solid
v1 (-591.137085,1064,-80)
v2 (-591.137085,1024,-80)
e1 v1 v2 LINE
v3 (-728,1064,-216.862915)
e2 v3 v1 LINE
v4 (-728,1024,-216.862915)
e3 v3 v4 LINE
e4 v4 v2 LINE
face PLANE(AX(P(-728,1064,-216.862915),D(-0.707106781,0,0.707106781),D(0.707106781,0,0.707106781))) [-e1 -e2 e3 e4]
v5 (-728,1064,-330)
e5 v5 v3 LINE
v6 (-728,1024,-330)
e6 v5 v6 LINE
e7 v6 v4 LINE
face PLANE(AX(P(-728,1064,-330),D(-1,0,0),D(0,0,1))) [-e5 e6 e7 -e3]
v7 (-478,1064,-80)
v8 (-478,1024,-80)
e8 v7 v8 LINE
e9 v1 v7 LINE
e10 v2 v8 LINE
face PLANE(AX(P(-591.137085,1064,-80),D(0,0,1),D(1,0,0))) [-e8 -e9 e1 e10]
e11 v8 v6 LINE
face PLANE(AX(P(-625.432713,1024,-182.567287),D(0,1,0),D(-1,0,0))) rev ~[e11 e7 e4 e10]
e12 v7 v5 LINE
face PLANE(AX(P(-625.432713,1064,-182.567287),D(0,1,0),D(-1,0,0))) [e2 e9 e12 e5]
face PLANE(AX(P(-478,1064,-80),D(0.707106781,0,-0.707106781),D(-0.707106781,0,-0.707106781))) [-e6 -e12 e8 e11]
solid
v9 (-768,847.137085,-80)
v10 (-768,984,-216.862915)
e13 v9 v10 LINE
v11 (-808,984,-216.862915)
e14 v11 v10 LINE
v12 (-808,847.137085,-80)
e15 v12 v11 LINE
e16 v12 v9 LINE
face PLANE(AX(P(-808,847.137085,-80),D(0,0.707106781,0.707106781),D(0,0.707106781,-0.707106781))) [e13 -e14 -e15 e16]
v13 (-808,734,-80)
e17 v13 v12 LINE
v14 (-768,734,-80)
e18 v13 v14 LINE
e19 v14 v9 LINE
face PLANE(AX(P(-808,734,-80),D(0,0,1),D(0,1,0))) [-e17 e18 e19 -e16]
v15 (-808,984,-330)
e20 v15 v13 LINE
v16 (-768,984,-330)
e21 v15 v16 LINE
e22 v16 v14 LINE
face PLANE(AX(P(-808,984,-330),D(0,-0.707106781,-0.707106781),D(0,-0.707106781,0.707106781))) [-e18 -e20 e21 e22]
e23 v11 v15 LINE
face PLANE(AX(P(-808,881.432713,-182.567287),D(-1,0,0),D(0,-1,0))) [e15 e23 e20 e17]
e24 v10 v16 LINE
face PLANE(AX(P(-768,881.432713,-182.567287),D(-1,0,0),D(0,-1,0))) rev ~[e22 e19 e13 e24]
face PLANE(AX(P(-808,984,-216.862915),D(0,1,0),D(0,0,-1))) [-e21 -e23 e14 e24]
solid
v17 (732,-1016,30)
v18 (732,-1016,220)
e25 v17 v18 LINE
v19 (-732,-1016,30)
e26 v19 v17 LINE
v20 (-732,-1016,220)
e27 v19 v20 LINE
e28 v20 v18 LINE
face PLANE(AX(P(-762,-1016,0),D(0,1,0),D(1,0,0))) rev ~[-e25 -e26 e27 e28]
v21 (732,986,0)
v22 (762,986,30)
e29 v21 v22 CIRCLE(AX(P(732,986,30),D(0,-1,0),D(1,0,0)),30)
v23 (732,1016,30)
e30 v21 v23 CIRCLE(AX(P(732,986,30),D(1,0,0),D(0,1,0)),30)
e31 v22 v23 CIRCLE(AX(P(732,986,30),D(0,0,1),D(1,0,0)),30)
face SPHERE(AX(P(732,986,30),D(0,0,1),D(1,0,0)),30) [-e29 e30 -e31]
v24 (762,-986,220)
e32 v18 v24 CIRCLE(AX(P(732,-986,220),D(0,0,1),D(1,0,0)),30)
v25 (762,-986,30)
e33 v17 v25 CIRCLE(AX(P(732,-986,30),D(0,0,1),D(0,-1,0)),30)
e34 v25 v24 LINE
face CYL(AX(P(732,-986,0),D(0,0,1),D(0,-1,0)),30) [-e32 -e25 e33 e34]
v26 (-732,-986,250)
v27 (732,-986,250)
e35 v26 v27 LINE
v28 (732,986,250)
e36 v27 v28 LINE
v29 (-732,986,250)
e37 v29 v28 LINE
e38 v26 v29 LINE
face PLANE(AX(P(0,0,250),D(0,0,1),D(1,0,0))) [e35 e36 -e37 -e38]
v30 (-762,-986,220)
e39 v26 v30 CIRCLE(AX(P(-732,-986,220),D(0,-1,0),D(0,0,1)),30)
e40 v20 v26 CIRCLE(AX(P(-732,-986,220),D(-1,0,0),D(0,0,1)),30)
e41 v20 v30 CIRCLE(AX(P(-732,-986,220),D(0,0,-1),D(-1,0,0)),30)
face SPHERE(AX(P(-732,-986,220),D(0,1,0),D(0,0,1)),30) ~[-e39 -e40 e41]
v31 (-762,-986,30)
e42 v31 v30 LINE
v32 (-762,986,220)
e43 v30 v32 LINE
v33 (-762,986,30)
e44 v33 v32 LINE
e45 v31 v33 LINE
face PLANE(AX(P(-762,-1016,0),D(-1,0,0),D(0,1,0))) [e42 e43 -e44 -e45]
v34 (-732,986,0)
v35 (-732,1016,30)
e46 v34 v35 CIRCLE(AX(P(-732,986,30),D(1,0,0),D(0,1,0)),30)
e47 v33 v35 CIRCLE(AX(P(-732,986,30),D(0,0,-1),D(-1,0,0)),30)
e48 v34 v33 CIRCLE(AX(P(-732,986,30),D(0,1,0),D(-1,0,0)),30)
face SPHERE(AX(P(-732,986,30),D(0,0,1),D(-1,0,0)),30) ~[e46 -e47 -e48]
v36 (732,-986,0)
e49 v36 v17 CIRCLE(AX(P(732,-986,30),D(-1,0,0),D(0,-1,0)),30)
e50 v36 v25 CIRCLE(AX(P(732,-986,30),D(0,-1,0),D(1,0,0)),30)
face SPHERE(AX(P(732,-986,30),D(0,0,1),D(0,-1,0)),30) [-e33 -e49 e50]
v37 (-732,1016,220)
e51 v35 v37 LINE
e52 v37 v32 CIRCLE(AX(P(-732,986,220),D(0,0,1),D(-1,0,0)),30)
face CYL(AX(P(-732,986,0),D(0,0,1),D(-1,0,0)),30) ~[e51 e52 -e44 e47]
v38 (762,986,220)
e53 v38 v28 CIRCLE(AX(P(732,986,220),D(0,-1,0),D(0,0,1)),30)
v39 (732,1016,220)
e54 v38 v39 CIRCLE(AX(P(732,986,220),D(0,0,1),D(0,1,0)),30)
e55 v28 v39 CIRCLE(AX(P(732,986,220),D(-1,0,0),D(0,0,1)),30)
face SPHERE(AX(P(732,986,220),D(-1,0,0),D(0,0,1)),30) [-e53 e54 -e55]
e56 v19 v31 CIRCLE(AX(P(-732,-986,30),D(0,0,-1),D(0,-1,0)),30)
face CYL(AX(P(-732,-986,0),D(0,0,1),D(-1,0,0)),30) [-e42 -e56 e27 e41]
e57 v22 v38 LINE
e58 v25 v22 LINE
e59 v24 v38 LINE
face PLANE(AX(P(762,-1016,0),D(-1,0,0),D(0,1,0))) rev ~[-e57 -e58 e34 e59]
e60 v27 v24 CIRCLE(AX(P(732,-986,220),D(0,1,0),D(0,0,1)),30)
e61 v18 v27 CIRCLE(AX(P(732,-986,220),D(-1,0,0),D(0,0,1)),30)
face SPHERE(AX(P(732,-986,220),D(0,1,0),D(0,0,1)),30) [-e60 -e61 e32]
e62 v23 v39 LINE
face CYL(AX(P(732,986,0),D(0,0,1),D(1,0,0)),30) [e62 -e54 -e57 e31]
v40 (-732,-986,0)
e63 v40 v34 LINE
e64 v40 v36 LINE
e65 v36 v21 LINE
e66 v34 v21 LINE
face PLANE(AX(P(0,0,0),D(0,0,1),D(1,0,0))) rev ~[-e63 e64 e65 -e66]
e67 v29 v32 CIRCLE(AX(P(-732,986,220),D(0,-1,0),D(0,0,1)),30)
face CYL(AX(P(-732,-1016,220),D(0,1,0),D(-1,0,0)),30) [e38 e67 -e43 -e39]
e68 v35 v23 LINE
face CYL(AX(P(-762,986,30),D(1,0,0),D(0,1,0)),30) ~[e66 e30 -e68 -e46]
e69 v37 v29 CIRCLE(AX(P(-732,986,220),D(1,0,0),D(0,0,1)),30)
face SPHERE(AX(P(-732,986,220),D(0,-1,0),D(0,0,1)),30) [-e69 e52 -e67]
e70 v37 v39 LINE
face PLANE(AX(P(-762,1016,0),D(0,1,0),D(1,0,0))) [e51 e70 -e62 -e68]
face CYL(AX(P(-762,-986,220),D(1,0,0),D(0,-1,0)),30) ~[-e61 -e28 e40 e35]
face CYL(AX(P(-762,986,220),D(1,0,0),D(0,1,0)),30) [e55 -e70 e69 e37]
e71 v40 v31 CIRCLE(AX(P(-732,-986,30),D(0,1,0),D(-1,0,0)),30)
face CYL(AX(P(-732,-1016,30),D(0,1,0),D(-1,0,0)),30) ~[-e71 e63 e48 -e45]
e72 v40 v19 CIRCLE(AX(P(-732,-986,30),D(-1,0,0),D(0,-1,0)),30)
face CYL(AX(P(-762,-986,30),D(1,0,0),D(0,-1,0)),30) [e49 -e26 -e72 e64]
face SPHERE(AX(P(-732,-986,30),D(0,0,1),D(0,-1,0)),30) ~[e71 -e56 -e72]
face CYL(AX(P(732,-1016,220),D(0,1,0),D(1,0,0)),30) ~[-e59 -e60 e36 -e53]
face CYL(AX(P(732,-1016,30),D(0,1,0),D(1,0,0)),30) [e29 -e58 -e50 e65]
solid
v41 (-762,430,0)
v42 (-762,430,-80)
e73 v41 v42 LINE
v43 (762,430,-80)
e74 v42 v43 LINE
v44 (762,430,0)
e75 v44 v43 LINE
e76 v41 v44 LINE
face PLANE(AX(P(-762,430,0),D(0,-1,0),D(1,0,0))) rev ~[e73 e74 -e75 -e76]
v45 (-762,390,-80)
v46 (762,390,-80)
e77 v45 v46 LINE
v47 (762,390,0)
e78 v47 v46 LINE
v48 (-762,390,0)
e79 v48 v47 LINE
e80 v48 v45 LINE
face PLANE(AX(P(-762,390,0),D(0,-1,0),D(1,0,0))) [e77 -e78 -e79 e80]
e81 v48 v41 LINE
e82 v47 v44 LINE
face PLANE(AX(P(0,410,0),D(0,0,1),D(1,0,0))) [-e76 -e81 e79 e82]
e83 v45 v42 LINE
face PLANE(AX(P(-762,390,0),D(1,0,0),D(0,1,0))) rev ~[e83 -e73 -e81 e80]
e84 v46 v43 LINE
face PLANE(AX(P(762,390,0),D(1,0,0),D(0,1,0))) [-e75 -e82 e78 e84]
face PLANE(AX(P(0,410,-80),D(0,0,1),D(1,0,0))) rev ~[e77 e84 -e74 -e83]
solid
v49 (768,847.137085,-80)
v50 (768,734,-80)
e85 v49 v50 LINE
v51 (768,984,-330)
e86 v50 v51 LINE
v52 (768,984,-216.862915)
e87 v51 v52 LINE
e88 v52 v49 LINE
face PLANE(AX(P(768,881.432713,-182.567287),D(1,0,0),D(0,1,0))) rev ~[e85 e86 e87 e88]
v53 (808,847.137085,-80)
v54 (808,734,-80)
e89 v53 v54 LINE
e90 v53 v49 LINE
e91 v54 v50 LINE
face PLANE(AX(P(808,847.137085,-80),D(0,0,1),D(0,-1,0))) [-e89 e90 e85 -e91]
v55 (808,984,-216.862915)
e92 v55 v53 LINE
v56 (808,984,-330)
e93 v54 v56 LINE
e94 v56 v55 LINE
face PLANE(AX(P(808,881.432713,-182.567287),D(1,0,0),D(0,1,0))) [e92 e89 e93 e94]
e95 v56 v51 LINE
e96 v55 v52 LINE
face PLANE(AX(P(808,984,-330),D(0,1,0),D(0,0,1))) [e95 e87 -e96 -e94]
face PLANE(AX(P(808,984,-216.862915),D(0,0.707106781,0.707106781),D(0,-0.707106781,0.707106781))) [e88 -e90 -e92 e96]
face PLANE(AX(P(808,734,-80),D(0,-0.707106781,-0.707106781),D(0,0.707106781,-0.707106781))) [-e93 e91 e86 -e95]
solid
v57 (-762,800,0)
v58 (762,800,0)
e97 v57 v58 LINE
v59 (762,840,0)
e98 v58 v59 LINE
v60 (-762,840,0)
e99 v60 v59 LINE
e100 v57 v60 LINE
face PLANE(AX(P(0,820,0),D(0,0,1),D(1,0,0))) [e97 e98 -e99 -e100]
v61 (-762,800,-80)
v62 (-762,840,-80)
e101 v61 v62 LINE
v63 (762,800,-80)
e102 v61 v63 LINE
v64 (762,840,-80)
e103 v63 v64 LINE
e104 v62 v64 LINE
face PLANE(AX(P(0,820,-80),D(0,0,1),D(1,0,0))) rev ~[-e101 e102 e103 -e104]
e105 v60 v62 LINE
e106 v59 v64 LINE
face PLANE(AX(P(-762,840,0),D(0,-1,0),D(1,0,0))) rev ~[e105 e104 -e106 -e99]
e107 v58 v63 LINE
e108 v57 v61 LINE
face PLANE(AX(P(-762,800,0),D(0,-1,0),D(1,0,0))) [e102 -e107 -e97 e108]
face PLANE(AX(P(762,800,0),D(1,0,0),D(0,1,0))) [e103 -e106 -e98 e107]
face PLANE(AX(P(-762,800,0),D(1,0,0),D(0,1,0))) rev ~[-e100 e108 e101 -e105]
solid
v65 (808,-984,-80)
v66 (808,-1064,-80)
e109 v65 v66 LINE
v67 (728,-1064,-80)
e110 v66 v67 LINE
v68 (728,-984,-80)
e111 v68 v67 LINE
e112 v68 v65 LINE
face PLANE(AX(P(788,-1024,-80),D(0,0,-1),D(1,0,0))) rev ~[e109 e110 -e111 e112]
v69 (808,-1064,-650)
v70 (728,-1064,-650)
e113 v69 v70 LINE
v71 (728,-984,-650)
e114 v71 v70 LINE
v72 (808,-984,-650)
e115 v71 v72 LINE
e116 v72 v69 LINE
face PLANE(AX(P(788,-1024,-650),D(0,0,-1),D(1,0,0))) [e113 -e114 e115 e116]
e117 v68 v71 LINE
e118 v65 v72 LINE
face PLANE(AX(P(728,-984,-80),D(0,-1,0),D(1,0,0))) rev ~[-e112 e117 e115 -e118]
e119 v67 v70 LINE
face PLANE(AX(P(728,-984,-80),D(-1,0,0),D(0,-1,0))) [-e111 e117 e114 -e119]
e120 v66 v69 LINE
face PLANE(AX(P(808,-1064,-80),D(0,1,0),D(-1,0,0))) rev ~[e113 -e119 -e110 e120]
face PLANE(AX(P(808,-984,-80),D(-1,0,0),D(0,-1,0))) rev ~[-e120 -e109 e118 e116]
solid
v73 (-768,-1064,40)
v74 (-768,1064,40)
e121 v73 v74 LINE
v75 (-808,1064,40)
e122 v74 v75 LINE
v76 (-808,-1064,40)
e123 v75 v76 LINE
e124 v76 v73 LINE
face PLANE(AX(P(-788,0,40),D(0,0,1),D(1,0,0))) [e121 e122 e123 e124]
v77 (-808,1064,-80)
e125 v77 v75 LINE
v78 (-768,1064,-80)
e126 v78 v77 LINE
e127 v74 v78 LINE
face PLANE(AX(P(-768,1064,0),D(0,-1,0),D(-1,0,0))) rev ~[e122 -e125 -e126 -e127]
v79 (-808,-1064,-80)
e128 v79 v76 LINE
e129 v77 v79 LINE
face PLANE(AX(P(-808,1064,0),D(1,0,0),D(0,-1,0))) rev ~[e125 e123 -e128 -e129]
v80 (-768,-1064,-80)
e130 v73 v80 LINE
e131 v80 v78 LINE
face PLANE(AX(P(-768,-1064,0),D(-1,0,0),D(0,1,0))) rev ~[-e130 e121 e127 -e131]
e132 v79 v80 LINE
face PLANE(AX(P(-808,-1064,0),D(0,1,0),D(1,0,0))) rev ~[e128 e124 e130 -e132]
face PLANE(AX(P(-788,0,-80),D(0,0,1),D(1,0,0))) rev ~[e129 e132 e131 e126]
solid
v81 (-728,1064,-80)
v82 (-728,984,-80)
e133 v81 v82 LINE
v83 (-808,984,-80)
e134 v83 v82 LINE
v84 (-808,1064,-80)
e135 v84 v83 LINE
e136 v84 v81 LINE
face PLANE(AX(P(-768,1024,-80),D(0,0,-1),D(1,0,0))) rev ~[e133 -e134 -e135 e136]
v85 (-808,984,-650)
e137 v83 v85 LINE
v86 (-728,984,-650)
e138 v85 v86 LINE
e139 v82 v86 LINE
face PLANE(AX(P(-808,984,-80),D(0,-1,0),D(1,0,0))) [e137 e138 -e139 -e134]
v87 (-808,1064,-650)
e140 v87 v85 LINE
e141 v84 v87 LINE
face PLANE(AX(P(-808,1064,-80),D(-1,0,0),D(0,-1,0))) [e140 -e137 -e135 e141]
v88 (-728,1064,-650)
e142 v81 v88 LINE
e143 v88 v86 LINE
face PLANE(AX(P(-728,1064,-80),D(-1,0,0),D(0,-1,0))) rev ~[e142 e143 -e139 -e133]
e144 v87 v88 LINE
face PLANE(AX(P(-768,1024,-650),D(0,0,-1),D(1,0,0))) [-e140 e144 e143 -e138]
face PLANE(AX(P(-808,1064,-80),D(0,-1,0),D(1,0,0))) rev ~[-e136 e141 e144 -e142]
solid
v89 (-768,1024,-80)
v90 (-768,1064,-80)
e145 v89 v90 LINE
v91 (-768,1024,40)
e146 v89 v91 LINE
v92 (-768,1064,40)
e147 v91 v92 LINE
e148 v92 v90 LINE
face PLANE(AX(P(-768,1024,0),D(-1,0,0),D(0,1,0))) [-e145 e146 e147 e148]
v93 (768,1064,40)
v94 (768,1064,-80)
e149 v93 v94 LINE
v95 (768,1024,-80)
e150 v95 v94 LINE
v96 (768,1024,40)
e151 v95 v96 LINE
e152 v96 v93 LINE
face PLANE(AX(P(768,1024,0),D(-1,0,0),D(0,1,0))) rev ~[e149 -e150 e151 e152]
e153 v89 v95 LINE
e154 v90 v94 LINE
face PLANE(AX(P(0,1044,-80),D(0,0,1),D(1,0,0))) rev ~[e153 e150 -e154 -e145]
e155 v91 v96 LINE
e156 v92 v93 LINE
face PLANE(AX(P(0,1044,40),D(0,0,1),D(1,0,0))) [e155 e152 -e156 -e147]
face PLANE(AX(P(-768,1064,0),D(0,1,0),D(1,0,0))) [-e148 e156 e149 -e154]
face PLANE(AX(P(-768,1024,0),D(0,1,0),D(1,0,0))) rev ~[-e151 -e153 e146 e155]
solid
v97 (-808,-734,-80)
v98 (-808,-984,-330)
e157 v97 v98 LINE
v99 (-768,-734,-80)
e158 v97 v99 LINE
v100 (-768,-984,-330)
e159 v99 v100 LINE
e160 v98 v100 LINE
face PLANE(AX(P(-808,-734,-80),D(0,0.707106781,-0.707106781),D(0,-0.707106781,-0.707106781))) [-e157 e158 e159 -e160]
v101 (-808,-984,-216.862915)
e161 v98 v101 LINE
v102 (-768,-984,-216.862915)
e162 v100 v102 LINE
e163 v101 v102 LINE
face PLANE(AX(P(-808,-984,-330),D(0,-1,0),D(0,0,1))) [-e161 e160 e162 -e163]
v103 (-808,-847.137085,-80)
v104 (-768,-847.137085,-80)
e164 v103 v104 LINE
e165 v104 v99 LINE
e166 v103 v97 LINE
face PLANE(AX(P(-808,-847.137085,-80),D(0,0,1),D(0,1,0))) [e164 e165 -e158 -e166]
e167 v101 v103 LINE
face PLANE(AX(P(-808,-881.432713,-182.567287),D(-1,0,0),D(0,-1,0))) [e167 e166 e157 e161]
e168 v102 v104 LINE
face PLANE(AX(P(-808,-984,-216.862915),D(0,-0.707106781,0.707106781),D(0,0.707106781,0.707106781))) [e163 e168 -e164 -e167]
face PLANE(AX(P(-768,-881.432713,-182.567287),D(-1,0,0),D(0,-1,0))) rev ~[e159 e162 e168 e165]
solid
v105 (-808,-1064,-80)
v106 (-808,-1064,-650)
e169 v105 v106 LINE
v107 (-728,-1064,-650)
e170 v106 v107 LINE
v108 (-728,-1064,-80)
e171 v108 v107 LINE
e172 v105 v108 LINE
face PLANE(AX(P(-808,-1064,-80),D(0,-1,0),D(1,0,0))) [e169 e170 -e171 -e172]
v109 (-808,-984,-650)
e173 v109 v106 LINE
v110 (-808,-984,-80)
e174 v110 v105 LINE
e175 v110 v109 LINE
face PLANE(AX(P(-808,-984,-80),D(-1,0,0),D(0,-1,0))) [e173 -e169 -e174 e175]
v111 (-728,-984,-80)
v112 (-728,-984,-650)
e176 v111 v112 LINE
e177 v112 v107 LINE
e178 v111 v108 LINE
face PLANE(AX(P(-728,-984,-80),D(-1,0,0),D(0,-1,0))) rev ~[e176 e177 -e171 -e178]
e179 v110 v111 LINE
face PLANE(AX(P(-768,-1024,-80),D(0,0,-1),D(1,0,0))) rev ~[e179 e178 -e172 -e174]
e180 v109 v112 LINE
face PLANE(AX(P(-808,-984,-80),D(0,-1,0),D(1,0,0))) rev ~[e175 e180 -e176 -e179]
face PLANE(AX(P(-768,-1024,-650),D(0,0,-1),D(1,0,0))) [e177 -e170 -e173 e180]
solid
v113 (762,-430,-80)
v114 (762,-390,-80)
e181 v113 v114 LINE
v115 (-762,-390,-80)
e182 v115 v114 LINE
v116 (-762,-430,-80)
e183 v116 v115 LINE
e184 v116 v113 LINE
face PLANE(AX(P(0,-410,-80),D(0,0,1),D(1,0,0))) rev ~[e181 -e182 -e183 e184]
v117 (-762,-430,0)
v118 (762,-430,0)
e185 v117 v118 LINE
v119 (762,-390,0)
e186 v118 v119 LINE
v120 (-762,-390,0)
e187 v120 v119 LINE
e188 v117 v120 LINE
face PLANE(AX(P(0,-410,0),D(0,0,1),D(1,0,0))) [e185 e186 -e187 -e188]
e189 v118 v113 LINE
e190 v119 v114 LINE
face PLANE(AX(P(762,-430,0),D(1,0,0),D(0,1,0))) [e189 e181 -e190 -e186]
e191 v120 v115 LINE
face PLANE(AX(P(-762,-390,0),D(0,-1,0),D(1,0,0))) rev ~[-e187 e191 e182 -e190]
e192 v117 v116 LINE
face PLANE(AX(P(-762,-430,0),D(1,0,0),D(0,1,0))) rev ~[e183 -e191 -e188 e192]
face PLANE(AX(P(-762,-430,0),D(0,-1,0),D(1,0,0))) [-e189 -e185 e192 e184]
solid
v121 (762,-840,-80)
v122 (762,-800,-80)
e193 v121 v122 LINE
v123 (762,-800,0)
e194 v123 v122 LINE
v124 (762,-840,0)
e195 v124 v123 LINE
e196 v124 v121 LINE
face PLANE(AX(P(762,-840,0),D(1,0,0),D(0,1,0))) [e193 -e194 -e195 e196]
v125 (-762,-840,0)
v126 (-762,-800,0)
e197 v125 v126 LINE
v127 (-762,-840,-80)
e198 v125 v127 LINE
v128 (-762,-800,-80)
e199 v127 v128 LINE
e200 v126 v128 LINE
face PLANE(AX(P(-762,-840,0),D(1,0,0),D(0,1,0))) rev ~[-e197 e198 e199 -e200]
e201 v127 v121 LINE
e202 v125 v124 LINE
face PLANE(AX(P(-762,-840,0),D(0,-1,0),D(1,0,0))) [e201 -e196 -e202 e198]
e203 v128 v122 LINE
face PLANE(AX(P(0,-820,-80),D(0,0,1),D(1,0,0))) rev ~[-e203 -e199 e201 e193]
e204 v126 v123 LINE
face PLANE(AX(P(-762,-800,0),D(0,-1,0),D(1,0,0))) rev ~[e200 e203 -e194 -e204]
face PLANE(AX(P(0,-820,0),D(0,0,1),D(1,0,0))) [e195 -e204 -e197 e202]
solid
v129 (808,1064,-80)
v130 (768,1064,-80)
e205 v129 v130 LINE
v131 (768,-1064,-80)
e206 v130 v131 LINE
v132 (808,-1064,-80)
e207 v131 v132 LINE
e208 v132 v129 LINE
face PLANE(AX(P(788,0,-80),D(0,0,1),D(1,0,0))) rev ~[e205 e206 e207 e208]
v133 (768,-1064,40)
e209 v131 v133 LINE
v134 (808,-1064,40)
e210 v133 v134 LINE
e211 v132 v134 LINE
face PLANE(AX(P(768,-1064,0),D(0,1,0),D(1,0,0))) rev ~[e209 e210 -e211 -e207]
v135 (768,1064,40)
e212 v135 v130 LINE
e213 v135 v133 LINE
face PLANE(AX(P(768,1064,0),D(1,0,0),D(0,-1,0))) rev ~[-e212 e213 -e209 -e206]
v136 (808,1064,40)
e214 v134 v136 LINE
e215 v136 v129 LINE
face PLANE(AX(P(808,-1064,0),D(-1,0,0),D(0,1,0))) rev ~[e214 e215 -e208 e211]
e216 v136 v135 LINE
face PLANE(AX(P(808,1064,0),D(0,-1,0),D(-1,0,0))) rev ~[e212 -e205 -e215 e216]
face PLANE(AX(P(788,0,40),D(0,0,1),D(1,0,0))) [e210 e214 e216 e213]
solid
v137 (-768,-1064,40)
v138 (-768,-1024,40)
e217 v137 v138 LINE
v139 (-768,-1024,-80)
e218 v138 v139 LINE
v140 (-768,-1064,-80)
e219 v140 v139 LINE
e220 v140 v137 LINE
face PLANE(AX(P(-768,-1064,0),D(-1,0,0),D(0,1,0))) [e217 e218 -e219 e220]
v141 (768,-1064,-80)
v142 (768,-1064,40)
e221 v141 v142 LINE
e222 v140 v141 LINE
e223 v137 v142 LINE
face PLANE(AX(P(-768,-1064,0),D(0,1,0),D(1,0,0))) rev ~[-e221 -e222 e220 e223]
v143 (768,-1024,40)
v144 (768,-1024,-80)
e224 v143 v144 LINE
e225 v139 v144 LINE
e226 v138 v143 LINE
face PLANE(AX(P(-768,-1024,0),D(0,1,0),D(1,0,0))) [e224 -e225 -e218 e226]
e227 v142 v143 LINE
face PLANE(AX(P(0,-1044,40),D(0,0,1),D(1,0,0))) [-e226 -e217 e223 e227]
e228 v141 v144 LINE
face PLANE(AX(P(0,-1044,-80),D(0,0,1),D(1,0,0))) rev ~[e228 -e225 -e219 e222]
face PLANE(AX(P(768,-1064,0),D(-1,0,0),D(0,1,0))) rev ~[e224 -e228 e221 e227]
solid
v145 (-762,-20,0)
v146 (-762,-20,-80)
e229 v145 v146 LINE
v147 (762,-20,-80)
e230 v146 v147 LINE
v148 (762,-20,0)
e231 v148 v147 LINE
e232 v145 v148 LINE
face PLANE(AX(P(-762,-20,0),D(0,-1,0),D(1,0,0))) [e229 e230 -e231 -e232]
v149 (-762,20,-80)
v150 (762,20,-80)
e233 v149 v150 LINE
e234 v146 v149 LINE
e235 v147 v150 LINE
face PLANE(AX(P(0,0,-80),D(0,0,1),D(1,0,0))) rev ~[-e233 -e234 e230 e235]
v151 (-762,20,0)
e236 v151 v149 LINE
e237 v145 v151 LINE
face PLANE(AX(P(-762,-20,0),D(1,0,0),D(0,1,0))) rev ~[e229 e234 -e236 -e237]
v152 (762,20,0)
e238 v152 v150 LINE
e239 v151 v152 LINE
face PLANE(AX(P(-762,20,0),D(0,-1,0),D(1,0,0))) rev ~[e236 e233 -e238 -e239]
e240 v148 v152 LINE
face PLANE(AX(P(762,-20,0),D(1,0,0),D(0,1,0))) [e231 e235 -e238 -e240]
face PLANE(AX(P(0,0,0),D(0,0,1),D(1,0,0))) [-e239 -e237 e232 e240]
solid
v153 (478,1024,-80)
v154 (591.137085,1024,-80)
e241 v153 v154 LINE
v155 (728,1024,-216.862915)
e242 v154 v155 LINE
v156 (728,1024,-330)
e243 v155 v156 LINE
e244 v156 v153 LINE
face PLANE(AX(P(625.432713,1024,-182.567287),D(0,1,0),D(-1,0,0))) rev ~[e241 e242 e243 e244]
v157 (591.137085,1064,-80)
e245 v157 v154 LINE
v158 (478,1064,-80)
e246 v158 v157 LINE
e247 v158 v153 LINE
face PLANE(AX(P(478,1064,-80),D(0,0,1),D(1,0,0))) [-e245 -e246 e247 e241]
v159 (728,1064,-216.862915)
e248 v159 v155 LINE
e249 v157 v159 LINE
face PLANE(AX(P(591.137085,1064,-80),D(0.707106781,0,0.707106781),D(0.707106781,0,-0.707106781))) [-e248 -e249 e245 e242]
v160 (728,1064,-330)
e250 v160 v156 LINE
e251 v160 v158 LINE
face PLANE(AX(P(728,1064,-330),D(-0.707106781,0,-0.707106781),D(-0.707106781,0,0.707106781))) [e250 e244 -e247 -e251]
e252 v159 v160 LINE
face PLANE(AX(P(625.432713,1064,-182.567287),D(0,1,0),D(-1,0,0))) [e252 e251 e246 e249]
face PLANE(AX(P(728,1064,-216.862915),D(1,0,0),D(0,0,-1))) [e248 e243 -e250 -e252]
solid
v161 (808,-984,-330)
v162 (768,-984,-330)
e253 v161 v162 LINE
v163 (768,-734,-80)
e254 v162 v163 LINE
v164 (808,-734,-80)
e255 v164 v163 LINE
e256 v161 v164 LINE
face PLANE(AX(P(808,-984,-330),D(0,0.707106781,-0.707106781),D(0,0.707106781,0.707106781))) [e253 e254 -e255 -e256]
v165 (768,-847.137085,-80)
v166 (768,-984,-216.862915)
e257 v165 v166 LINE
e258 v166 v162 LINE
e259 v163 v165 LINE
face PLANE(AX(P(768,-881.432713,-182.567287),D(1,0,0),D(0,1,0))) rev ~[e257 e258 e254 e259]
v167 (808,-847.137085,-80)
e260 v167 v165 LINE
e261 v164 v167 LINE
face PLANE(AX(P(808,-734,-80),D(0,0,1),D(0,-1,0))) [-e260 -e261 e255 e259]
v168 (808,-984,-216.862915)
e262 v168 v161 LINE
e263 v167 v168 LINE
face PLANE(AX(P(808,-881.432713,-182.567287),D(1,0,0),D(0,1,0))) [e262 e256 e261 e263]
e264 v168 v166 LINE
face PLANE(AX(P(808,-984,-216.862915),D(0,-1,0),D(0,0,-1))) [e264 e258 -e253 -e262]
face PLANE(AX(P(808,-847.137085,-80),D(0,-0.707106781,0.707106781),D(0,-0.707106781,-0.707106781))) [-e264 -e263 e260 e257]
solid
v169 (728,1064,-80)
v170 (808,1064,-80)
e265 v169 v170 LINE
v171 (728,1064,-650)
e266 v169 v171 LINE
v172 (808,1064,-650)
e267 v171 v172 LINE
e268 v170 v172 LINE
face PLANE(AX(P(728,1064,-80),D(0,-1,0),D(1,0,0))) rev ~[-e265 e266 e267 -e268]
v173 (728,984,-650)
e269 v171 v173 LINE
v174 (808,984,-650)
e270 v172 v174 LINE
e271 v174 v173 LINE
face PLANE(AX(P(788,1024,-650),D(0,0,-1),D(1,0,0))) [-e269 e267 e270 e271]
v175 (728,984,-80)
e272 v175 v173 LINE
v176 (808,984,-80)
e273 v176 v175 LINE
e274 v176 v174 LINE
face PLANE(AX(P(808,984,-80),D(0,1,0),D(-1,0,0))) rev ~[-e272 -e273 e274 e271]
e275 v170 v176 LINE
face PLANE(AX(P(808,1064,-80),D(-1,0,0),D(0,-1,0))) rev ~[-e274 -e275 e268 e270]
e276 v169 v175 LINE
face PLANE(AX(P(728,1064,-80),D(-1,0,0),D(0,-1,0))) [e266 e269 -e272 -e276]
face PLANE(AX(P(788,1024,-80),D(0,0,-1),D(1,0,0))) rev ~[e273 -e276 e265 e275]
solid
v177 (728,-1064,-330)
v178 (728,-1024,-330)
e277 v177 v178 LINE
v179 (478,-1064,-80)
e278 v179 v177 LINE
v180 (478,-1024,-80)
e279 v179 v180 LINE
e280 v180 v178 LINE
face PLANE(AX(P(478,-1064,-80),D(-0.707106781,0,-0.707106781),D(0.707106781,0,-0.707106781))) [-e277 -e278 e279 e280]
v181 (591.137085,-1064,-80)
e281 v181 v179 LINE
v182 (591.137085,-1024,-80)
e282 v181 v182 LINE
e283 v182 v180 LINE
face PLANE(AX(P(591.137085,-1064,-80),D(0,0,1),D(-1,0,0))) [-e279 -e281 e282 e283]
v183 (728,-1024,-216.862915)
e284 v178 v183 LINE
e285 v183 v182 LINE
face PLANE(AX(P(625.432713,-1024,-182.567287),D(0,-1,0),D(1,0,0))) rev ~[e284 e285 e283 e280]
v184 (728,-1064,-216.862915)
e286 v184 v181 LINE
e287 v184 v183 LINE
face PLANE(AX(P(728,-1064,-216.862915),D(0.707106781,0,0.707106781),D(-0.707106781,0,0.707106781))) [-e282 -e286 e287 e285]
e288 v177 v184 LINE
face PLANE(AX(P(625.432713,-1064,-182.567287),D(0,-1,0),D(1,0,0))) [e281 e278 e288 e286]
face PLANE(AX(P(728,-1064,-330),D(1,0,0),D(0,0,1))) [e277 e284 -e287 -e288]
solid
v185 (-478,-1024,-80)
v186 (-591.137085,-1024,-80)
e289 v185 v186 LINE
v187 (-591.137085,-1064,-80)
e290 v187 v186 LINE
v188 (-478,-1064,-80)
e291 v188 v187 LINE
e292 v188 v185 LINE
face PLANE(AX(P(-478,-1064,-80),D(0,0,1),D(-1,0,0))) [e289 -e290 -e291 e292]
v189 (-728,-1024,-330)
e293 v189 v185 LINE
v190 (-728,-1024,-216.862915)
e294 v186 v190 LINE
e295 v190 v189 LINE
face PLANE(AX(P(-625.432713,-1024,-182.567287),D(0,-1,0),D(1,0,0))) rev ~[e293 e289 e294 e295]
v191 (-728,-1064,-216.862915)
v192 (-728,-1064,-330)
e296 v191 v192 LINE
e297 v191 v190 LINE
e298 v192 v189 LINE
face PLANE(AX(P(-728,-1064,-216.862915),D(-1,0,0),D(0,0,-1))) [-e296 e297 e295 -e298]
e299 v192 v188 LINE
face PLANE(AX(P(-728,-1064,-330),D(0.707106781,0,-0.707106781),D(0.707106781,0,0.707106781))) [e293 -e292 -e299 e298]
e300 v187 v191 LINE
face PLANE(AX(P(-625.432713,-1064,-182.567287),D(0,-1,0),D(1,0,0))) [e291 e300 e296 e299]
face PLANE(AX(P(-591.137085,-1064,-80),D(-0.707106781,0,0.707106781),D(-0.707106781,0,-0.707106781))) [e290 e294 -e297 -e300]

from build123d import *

# Parameters (mm, degrees)
F1_W      = 1524
F1_H      = 2032
F2_DEPTH  = 250
F3_R      = 30
F5_DEPTH  = 80
F4_W      = 1536
F4_H      = 40
F6_DEPTH  = 80
F4_W_2    = 1524
F7_DEPTH  = 40
F8_DEPTH  = 40
F9_DEPTH  = 40
F10_DEPTH = 40
F11_W     = 80
F11_H     = 80
F13_DEPTH = 570
F11_W_2   = 40
F15_DEPTH = 40
F17_DEPTH = 40
F19_DEPTH = 40
F21_DEPTH = 40


with BuildPart() as f2:
    # F1 (on Top) → F2 (new body)
    with BuildSketch(Plane.XY):
        Rectangle(F1_W, F1_H)
    extrude(amount=F2_DEPTH)

    # F3
    f3_edges = [f2.edges().sort_by_distance(p)[0] for p in [
        (-762, 0, 250),
        (0, 1016, 250),
        (762, 0, 250),
        (0, -1016, 250),
        (-762, -1016, 125),
        (-762, 1016, 125),
        (762, -1016, 125),
        (0, -1016, 0),
        (-762, 0, 0),
        (762, 1016, 125),
        (762, 0, 0),
        (0, 1016, 0),
    ]]
    fillet(f3_edges, radius=F3_R)


with BuildPart() as f5:
    # F4 (on face) → F5 (new body)
    with BuildSketch(Plane.XY):
        Polygon((-768, 840), (-768, 1024), (-768, 1064), (-808, 1064), (-808, -1064), (-768, -1064), (-768, -1024), (-768, -840), (-768, -800), (-768, -430), (-768, -390), (-768, -20), (-768, 20), (-768, 390), (-768, 430), (-768, 800), align=None)
    extrude(amount=-F5_DEPTH)

    # F4 (on face) → F9 (join)
    with BuildSketch(Plane.XY):
        Polygon((-768, 840), (-768, 1024), (-768, 1064), (-808, 1064), (-808, -1064), (-768, -1064), (-768, -1024), (-768, -840), (-768, -800), (-768, -430), (-768, -390), (-768, -20), (-768, 20), (-768, 390), (-768, 430), (-768, 800), align=None)
    extrude(amount=F9_DEPTH)


with BuildPart() as f5b:
    # F4 (on face) → F5, piece 2 (new body)
    with BuildSketch(Plane.XY):
        Polygon((768, 1064), (768, 1024), (768, 840), (768, 800), (768, 430), (768, 390), (768, 20), (768, -20), (768, -390), (768, -430), (768, -800), (768, -840), (768, -1024), (768, -1064), (808, -1064), (808, 1064), align=None)
    extrude(amount=-F5_DEPTH)

    # F4 (on face) → F7 (join)
    with BuildSketch(Plane.XY):
        Polygon((768, 1064), (768, 1024), (768, 840), (768, 800), (768, 430), (768, 390), (768, 20), (768, -20), (768, -390), (768, -430), (768, -800), (768, -840), (768, -1024), (768, -1064), (808, -1064), (808, 1064), align=None)
    extrude(amount=F7_DEPTH)


with BuildPart() as f6:
    # F4 (on face) → F6 (new body)
    with BuildSketch(Plane.XY):
        with Locations((0, 1044)):
            Rectangle(F4_W, F4_H)
    extrude(amount=-F6_DEPTH)

    # F4 (on face) → F8 (join)
    with BuildSketch(Plane.XY):
        with Locations((0, 1044)):
            Rectangle(F4_W, F4_H)
    extrude(amount=F8_DEPTH)


with BuildPart() as f6b:
    # F4 (on face) → F6, piece 2 (new body)
    with BuildSketch(Plane.XY):
        with Locations((0, 820)):
            Rectangle(F4_W_2, F4_H)
    extrude(amount=-F6_DEPTH)


with BuildPart() as f6c:
    # F4 (on face) → F6, piece 3 (new body)
    with BuildSketch(Plane.XY):
        with Locations((0, 410)):
            Rectangle(F4_W_2, F4_H)
    extrude(amount=-F6_DEPTH)


with BuildPart() as f6d:
    # F4 (on face) → F6, piece 4 (new body)
    with BuildSketch(Plane.XY):
        Rectangle(F4_W_2, F4_H)
    extrude(amount=-F6_DEPTH)


with BuildPart() as f6e:
    # F4 (on face) → F6, piece 5 (new body)
    with BuildSketch(Plane.XY):
        with Locations((0, -410)):
            Rectangle(F4_W_2, F4_H)
    extrude(amount=-F6_DEPTH)


with BuildPart() as f6f:
    # F4 (on face) → F6, piece 6 (new body)
    with BuildSketch(Plane.XY):
        with Locations((0, -820)):
            Rectangle(F4_W_2, F4_H)
    extrude(amount=-F6_DEPTH)


with BuildPart() as f6g:
    # F4 (on face) → F6, piece 7 (new body)
    with BuildSketch(Plane.XY):
        with Locations((0, -1044)):
            Rectangle(F4_W, F4_H)
    extrude(amount=-F6_DEPTH)

    # F4 (on face) → F10 (join)
    with BuildSketch(Plane.XY):
        with Locations((0, -1044)):
            Rectangle(F4_W, F4_H)
    extrude(amount=F10_DEPTH)


with BuildPart() as f13:
    # F11 (on face) → F13 (new body, through all)
    with BuildSketch(Plane(origin=(0, 0, -80), x_dir=(1, 0, 0), z_dir=(0, 0, -1))):
        with Locations((-768, 1024)):
            Rectangle(F11_W, F11_H)
    extrude(amount=F13_DEPTH)


with BuildPart() as f13b:
    # F11 (on face) → F13, piece 2 (new body, through all)
    with BuildSketch(Plane(origin=(0, 0, -80), x_dir=(1, 0, 0), z_dir=(0, 0, -1))):
        with Locations((788, 1024)):
            Rectangle(F11_W_2, F11_H)
        with Locations((748, 1024)):
            Rectangle(F11_W_2, F11_H)
    extrude(amount=F13_DEPTH)


with BuildPart() as f13c:
    # F11 (on face) → F13, piece 3 (new body, through all)
    with BuildSketch(Plane(origin=(0, 0, -80), x_dir=(1, 0, 0), z_dir=(0, 0, -1))):
        with Locations((788, -1024)):
            Rectangle(F11_W_2, F11_H)
        with Locations((748, -1024)):
            Rectangle(F11_W_2, F11_H)
    extrude(amount=F13_DEPTH)


with BuildPart() as f13d:
    # F11 (on face) → F13, piece 4 (new body, through all)
    with BuildSketch(Plane(origin=(0, 0, -80), x_dir=(1, 0, 0), z_dir=(0, 0, -1))):
        with Locations((-768, -1024)):
            Rectangle(F11_W, F11_H)
    extrude(amount=F13_DEPTH)


with BuildPart() as f15:
    # F14 (on face) → F15 (new body, through all)
    with BuildSketch(Plane.XZ.offset(1064)):
        Polygon((-728, -216.8629150101), (-728, -330), (-478, -80), (-591.1370849899, -80), align=None)
    extrude(amount=-F15_DEPTH)


with BuildPart() as f15b:
    # F14 (on face) → F15, piece 2 (new body, through all)
    with BuildSketch(Plane.XZ.offset(1064)):
        Polygon((591.1370849899, -80), (478, -80), (728, -330), (728, -216.8629150101), align=None)
    extrude(amount=-F15_DEPTH)


with BuildPart() as f17:
    # F16 (on face) → F17 (new body, through all)
    with BuildSketch(Plane(origin=(0, 1064, 0), x_dir=(-1, 0, 0), z_dir=(0, 1, 0))):
        Polygon((-591.1370849898, -80), (-728, -216.8629150102), (-728, -330), (-478, -80), align=None)
    extrude(amount=-F17_DEPTH)


with BuildPart() as f17b:
    # F16 (on face) → F17, piece 2 (new body, through all)
    with BuildSketch(Plane(origin=(0, 1064, 0), x_dir=(-1, 0, 0), z_dir=(0, 1, 0))):
        Polygon((591.1370849899, -80), (478, -80), (728, -330), (728, -216.8629150102), align=None)
    extrude(amount=-F17_DEPTH)


with BuildPart() as f19:
    # F18 (on face) → F19 (new body, through all)
    with BuildSketch(Plane.YZ.offset(808)):
        Polygon((-984, -330), (-734, -80), (-847.1370849899, -80), (-984, -216.8629150101), align=None)
    extrude(amount=-F19_DEPTH)


with BuildPart() as f19b:
    # F18 (on face) → F19, piece 2 (new body, through all)
    with BuildSketch(Plane.YZ.offset(808)):
        Polygon((734, -80), (984, -330), (984, -216.8629150101), (847.1370849899, -80), align=None)
    extrude(amount=-F19_DEPTH)


with BuildPart() as f21:
    # F20 (on face) → F21 (new body, through all)
    with BuildSketch(Plane(origin=(-808, 0, 0), x_dir=(0, -1, 0), z_dir=(-1, 0, 0))):
        Polygon((-847.1370849899, -80), (-984, -216.8629150101), (-984, -330), (-734, -80), align=None)
    extrude(amount=-F21_DEPTH)


with BuildPart() as f21b:
    # F20 (on face) → F21, piece 2 (new body, through all)
    with BuildSketch(Plane(origin=(-808, 0, 0), x_dir=(0, -1, 0), z_dir=(-1, 0, 0))):
        Polygon((984, -216.8629150101), (847.1370849899, -80), (734, -80), (984, -330), align=None)
    extrude(amount=-F21_DEPTH)


solid = Compound([f2.part, f5.part, f5b.part, f6.part, f6b.part, f6c.part, f6d.part, f6e.part, f6f.part, f6g.part, f13.part, f13b.part, f13c.part, f13d.part, f15.part, f15b.part, f17.part, f17b.part, f19.part, f19b.part, f21.part, f21b.part])
